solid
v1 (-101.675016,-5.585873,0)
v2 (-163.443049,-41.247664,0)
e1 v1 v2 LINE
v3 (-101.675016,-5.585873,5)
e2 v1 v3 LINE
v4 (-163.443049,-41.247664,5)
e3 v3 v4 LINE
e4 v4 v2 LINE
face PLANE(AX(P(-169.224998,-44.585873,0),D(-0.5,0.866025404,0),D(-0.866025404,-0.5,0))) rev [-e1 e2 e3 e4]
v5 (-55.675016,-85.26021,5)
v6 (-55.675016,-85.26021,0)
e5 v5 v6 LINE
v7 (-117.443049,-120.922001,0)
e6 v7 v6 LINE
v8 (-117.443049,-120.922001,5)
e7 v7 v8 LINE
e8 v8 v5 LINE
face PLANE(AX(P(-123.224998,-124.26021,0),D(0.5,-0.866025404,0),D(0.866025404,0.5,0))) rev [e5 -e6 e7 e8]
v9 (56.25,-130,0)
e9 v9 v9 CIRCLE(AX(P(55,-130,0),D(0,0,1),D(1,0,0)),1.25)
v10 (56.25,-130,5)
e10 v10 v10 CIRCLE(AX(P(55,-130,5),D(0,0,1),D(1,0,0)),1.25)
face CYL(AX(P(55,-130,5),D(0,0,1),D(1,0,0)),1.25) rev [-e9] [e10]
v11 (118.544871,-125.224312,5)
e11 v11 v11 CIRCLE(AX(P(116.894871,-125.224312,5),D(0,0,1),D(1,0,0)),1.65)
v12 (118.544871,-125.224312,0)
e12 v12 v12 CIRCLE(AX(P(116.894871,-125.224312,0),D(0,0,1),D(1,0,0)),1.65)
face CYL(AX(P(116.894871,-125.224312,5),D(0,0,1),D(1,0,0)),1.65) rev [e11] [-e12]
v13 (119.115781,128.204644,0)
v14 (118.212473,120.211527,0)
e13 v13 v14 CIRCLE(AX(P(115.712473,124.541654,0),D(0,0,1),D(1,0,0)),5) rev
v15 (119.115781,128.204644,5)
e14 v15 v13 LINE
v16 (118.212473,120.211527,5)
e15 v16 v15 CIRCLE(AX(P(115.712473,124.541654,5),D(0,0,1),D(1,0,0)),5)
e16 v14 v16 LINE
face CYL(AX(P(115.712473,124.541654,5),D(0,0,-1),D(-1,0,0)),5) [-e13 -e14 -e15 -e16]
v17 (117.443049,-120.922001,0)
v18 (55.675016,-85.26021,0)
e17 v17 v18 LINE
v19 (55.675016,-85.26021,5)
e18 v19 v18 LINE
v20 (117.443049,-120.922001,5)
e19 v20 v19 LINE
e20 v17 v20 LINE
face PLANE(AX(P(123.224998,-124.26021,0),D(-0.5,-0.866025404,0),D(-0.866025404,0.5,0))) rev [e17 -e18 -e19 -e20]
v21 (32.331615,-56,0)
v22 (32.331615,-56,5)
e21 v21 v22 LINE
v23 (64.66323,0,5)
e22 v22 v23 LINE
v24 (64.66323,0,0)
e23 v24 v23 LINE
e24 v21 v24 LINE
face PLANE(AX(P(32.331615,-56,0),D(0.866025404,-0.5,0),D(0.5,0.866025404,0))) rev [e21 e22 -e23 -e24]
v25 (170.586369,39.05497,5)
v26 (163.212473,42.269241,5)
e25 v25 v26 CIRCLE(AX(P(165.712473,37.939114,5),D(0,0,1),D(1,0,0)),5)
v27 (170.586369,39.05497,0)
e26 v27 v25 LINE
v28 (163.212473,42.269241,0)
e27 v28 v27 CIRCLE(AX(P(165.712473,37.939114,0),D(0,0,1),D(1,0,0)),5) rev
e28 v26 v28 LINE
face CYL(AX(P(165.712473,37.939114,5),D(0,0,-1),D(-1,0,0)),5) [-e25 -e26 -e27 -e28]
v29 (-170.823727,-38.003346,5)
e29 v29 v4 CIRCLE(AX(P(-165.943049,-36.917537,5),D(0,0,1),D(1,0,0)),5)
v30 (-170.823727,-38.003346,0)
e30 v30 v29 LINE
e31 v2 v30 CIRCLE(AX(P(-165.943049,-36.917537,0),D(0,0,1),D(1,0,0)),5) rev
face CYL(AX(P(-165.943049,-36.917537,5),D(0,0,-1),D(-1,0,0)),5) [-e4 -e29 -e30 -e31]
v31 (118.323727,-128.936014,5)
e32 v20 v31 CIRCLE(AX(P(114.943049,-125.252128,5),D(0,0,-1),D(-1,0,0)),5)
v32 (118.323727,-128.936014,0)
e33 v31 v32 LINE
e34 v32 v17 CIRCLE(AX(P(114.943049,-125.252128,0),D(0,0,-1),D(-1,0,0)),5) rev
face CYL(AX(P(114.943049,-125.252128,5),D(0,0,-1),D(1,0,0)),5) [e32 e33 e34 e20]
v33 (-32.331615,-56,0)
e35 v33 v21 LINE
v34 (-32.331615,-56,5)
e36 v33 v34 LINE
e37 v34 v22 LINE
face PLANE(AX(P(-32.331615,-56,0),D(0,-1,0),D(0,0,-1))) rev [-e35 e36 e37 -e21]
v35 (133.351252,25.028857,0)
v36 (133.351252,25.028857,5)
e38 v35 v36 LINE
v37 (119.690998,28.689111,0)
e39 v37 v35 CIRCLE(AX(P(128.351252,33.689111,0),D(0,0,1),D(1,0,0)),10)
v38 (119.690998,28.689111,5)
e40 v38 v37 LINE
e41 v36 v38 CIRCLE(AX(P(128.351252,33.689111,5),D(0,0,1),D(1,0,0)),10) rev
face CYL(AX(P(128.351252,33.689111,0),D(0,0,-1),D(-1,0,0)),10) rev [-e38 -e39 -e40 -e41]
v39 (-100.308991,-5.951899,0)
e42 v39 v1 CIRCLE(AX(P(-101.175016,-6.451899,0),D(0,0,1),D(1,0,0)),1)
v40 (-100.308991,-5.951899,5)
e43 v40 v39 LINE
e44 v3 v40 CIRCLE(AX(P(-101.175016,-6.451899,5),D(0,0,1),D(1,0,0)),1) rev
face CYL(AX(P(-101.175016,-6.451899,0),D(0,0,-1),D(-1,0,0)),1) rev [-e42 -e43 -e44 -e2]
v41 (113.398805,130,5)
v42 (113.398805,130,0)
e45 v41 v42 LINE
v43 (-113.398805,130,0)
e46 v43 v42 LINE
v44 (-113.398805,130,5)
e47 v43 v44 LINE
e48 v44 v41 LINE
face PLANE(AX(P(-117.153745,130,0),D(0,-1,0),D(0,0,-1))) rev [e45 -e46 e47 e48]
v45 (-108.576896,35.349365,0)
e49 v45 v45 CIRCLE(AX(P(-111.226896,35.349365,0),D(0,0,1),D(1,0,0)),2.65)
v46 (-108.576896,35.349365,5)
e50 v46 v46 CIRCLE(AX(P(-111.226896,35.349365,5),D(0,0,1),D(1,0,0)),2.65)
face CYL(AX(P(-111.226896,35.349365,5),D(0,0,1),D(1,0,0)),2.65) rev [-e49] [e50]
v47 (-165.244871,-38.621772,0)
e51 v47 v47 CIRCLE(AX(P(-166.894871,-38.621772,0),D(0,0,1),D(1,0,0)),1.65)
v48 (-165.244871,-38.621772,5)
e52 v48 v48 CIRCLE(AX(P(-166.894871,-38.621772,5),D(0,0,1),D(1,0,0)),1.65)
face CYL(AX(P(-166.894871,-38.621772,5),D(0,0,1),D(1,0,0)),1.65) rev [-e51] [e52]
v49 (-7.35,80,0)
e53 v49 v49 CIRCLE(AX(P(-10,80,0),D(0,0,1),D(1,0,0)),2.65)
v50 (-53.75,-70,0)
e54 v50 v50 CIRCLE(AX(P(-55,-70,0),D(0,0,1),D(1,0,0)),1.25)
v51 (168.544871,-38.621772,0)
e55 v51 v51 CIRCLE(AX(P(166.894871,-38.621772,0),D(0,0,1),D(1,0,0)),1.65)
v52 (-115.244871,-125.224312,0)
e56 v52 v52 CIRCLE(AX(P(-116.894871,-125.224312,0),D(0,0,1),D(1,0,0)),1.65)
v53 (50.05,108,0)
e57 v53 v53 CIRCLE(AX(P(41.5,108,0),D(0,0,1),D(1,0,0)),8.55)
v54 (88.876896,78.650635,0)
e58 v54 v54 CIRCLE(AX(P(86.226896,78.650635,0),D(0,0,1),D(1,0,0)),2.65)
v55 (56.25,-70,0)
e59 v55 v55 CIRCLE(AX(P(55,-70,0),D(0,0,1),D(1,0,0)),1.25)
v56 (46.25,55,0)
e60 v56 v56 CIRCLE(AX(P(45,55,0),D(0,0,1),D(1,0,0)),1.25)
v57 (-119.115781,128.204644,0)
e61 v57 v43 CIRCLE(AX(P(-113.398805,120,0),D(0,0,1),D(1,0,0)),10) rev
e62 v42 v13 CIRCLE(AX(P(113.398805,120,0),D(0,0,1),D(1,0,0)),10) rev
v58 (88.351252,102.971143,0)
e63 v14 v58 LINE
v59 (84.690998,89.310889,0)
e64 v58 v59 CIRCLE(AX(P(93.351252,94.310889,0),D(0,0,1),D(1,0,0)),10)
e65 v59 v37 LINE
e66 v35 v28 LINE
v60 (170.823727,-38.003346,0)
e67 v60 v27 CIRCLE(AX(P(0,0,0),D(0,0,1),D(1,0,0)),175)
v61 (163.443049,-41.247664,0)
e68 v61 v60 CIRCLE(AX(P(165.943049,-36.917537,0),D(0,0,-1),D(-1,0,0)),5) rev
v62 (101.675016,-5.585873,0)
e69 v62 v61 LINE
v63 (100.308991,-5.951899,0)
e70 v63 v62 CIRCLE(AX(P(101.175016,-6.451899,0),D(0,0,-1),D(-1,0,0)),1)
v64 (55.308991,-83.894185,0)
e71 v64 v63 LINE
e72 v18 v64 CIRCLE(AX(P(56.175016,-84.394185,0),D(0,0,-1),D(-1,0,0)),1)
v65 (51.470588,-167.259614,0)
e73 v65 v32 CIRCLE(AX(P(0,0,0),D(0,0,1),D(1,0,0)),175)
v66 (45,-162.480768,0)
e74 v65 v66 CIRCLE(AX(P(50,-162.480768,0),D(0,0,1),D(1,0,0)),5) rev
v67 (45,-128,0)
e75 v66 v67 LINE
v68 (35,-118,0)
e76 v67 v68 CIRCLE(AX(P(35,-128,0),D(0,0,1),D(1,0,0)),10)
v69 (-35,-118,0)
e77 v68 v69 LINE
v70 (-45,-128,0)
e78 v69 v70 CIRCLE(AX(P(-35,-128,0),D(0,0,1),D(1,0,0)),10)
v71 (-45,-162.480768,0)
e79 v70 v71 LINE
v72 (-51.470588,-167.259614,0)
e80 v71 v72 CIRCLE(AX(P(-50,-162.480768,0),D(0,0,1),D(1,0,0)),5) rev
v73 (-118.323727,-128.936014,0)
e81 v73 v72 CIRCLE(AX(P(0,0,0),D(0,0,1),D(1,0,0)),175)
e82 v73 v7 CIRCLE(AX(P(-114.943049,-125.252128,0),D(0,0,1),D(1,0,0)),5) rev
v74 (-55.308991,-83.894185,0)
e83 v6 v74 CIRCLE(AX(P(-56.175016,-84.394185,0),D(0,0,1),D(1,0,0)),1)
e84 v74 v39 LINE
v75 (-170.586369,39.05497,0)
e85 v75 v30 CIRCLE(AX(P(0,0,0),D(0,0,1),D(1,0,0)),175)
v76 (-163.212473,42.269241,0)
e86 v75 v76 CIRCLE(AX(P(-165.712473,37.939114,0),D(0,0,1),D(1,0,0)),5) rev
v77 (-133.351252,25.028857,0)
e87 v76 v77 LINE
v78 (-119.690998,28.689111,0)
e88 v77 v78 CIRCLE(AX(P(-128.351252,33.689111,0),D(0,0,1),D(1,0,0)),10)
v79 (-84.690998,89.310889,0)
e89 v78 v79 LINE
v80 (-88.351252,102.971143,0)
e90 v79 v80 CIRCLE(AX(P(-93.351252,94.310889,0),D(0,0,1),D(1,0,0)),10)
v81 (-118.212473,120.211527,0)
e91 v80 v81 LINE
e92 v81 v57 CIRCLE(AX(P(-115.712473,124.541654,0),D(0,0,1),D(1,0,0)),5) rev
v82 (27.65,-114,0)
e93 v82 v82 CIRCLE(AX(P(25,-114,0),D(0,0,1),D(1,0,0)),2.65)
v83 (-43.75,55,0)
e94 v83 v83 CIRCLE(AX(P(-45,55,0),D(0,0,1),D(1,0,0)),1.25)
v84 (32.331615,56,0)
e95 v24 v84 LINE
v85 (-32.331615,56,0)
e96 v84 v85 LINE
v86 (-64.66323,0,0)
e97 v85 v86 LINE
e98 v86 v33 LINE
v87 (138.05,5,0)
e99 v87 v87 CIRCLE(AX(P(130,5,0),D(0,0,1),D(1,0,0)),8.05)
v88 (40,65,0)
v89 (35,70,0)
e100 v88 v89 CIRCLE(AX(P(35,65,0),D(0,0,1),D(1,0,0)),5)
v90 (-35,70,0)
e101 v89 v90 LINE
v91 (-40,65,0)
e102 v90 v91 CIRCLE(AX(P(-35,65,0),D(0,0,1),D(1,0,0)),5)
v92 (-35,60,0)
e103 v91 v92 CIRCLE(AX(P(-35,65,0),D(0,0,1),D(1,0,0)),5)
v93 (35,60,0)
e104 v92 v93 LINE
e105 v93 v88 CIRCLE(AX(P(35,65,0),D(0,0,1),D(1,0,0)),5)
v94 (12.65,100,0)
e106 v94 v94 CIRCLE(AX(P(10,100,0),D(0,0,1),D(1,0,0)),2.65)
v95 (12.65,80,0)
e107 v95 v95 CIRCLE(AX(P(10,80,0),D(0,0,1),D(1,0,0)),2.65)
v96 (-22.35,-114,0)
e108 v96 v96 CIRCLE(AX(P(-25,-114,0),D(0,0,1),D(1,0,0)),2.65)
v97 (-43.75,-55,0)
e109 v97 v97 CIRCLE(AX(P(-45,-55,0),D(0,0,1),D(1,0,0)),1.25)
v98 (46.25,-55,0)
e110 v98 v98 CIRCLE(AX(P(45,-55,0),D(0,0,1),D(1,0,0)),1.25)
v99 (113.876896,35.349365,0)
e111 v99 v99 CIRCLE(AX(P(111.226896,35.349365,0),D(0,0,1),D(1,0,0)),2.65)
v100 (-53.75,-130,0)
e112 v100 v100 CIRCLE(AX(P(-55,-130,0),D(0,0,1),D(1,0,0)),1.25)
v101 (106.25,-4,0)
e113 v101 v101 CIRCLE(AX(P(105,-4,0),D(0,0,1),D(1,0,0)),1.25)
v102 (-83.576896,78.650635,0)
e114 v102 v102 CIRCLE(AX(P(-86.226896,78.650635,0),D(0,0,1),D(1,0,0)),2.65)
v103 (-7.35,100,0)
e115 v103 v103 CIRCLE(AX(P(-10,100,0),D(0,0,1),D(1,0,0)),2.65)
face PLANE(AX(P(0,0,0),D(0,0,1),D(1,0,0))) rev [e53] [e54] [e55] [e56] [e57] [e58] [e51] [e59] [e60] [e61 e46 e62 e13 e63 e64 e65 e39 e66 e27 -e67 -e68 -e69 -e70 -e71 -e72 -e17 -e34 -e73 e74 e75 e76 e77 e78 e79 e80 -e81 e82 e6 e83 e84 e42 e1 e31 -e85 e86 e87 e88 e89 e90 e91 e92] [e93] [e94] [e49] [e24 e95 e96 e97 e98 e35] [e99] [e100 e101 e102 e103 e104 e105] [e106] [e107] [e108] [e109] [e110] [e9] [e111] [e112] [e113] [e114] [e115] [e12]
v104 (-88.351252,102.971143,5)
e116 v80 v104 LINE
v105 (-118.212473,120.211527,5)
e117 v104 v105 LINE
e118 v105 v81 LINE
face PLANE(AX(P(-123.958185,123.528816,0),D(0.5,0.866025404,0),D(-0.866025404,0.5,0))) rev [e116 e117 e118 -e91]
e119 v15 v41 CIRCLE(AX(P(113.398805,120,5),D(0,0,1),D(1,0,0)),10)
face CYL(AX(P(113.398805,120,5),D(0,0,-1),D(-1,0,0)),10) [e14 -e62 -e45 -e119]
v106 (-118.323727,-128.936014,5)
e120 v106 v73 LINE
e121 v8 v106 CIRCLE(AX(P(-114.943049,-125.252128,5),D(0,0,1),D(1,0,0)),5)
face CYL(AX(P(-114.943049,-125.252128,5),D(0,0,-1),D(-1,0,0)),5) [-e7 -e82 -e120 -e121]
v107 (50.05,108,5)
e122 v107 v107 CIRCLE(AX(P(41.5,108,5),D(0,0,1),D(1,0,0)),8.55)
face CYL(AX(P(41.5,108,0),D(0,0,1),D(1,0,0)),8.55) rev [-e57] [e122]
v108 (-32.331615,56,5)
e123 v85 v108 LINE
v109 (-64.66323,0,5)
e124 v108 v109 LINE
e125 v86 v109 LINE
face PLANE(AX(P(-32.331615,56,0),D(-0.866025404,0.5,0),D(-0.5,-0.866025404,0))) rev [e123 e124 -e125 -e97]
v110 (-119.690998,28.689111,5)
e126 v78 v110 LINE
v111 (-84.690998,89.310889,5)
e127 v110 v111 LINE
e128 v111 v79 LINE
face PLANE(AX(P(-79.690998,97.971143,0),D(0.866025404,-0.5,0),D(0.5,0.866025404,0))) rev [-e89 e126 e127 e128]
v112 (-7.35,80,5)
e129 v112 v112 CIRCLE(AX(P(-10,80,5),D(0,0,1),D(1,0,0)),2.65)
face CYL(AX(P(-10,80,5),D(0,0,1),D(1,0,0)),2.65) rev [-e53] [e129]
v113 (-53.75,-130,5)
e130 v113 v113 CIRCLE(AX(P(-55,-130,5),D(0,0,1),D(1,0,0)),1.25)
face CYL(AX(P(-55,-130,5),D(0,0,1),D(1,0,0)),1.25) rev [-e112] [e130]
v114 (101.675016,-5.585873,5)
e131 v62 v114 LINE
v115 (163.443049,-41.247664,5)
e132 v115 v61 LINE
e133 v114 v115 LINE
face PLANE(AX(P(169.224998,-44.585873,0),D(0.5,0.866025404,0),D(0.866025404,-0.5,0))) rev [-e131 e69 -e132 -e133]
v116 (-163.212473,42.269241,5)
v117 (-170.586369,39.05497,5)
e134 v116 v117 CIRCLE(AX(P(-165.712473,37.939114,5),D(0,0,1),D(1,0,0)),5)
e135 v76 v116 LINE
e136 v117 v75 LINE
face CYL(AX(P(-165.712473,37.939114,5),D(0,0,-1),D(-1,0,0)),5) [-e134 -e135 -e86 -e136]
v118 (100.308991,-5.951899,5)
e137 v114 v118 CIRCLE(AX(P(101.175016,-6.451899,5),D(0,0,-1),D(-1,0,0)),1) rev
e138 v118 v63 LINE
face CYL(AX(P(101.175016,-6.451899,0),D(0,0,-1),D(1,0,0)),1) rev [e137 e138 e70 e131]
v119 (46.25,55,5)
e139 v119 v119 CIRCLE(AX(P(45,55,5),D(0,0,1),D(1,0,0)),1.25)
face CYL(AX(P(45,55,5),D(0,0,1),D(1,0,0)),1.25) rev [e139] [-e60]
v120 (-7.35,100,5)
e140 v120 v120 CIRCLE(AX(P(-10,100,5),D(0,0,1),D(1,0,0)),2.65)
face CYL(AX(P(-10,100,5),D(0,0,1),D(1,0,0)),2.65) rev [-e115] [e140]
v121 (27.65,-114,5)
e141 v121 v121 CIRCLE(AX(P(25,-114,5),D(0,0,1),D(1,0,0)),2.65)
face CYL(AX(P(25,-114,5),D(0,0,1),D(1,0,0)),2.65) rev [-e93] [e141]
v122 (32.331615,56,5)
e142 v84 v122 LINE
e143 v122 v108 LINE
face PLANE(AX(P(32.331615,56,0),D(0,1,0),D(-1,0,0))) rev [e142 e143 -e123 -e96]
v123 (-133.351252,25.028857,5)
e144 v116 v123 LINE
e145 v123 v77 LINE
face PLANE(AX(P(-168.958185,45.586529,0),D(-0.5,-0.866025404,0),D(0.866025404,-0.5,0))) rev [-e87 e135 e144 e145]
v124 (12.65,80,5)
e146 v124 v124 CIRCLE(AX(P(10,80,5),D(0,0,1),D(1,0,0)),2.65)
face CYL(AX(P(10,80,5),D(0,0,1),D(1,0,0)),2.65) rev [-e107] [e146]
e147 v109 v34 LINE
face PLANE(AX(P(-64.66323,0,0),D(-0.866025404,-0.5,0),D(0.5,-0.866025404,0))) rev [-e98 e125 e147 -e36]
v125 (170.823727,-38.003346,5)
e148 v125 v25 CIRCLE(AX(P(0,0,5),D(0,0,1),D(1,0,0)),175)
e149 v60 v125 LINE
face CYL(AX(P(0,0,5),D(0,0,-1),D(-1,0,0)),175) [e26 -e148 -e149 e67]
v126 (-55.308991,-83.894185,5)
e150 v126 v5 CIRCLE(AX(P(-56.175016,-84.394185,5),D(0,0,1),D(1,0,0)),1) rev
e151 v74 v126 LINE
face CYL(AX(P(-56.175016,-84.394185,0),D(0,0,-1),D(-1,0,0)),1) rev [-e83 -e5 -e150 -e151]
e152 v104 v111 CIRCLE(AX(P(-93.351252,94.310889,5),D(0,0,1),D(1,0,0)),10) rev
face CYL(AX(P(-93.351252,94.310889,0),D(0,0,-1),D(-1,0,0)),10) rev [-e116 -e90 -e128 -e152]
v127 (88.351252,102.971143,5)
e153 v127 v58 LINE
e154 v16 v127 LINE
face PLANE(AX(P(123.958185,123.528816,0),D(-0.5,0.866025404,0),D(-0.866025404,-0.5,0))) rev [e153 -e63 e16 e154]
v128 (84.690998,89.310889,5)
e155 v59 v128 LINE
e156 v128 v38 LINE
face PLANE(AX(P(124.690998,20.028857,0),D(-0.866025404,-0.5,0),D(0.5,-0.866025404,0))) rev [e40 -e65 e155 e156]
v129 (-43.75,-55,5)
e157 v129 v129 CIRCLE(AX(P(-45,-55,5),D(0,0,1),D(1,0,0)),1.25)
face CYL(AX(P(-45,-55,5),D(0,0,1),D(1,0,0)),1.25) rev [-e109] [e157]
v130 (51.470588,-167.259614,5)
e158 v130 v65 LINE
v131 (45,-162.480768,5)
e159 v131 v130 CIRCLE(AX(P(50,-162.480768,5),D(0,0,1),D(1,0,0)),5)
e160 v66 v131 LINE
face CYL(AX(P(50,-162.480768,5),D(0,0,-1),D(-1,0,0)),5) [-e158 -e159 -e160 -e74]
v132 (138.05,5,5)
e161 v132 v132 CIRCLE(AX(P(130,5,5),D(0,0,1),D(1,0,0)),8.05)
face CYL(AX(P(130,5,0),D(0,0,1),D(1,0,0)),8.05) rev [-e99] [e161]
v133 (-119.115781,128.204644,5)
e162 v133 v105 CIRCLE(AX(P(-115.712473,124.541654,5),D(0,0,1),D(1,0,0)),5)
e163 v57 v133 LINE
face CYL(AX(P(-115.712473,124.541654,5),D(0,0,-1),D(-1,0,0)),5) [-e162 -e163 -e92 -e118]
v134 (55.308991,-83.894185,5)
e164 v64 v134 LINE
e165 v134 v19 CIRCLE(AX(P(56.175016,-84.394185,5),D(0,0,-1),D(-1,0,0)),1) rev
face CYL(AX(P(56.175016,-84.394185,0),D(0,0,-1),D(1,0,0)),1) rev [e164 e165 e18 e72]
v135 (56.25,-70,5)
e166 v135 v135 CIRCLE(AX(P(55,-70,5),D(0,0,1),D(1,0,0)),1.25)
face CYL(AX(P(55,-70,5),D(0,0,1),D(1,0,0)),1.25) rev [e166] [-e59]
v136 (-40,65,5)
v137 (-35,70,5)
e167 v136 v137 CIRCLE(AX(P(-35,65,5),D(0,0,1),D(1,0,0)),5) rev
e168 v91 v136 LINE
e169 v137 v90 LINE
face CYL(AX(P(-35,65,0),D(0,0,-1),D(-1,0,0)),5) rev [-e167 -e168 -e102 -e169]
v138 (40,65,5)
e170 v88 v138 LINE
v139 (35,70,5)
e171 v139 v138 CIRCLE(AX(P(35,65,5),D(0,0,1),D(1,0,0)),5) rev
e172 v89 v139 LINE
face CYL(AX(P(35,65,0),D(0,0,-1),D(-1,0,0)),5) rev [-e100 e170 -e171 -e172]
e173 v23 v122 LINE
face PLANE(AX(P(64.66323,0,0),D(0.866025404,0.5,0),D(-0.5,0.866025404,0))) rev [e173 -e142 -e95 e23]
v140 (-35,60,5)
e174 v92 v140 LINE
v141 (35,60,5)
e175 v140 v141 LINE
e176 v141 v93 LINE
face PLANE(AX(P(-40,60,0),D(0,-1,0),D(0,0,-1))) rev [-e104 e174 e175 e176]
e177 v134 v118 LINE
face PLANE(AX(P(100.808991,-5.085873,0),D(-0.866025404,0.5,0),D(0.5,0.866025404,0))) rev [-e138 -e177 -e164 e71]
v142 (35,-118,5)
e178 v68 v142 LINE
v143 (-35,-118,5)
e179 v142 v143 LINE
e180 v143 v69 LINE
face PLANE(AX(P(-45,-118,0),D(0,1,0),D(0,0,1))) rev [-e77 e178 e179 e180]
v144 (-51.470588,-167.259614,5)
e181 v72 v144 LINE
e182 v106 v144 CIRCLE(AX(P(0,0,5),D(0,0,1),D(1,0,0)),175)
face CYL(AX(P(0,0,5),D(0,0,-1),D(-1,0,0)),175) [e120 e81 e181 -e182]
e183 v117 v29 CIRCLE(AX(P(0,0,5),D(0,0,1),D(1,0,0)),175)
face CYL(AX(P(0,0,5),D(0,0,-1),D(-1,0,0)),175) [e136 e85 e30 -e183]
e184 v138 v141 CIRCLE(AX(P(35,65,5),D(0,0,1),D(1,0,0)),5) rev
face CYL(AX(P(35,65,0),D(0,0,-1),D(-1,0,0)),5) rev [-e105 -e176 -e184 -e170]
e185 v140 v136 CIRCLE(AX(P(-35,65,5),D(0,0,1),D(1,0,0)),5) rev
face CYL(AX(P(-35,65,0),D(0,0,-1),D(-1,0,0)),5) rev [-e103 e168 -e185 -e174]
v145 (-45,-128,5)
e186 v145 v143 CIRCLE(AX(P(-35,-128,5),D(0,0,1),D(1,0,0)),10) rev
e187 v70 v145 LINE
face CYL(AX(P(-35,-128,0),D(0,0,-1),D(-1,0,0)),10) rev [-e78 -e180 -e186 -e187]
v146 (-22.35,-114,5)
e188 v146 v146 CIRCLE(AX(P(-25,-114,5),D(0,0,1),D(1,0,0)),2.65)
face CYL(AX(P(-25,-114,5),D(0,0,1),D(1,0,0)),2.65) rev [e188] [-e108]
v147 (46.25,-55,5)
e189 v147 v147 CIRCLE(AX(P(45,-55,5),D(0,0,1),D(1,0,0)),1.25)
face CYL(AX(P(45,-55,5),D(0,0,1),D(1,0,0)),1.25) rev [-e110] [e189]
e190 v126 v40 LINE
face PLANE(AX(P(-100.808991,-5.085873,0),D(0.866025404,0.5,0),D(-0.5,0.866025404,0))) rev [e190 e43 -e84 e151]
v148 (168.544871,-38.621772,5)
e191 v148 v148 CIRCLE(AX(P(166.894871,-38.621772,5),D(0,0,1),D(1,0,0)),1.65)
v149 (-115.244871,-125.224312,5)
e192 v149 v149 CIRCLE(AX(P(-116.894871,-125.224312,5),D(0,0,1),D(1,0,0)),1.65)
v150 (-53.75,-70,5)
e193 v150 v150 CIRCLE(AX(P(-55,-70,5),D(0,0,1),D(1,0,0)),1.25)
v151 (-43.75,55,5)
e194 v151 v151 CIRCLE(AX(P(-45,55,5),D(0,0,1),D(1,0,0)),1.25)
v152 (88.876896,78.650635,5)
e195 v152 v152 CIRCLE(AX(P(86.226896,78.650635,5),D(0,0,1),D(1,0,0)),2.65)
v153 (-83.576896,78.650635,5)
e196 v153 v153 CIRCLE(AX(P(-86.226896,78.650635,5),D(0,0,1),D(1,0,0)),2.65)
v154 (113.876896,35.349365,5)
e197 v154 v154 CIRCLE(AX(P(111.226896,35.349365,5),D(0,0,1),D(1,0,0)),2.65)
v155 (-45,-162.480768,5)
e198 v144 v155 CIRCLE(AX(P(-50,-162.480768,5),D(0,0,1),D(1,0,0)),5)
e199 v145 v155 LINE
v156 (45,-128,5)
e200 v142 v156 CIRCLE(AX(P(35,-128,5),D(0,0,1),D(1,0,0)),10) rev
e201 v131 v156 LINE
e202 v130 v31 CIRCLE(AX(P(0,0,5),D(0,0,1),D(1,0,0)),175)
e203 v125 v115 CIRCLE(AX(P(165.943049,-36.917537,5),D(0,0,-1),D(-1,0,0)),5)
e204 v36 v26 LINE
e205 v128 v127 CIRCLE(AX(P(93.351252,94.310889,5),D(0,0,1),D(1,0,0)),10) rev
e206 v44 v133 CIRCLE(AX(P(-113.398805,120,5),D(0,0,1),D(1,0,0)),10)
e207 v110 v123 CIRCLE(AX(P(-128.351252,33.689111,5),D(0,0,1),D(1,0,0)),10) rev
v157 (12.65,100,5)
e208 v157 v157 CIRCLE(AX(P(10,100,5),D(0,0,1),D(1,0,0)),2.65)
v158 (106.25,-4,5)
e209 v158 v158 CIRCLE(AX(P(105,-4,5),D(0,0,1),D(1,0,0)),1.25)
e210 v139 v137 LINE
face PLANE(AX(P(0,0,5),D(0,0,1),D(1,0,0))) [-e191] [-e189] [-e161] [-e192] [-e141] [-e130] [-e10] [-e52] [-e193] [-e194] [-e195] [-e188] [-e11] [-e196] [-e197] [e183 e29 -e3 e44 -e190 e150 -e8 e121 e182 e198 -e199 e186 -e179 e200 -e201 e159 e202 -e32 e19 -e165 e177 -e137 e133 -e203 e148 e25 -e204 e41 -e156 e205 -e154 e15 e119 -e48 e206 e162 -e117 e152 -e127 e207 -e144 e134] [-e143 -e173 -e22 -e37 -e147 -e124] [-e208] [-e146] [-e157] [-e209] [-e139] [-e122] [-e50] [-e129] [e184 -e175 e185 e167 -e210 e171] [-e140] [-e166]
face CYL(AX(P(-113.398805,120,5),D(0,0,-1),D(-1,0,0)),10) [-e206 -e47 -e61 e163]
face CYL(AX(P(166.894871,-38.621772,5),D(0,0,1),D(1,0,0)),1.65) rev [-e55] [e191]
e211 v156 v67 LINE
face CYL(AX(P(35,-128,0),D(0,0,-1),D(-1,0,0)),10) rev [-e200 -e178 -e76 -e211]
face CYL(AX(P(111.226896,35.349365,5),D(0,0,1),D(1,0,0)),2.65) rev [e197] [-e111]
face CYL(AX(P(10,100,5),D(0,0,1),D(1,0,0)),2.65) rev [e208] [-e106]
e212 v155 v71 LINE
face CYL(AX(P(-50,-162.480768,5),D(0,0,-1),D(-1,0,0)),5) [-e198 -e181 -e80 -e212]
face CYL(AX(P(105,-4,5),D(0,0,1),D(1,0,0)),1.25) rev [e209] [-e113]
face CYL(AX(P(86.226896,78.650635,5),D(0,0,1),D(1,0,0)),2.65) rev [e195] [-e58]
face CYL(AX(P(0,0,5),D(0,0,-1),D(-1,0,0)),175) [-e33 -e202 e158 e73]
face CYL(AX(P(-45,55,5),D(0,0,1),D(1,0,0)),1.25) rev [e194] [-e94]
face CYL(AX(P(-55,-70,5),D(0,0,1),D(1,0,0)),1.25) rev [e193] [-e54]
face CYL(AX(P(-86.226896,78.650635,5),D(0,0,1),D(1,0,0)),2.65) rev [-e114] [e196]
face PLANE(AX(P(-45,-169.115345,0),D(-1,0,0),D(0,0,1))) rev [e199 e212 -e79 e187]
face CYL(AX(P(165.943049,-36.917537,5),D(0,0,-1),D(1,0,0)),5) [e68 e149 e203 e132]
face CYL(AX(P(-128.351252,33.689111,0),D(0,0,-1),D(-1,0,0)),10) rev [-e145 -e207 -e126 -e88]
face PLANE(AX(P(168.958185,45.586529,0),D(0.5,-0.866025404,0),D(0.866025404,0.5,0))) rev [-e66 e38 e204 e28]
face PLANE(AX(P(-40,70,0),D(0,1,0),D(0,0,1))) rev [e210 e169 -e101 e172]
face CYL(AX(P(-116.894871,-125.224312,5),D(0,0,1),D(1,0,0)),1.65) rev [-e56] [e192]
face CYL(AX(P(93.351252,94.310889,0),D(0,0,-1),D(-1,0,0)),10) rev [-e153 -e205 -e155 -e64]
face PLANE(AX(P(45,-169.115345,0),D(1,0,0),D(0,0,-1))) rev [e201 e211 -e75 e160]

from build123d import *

# Parameters (mm, degrees)
SKETCH_1_R                   = 175
EXTRUDE_1_DEPTH              = 5
CUT_EXTRUDE_1_DEPTH          = 248.53787589
CUT_EXTRUDE_2_DEPTH          = 248.53787589
CUT_EXTRUDE_5_DEPTH          = 248.53787589
CUT_EXTRUDE_4_DEPTH          = 248.53787589
HOLE_WIZARD_M5_1_D           = 5.3
FILLET_1_R                   = 1
FILLET_2_R                   = 10
FILLET_3_R                   = 5
PATTERN_CIRCULAR_1_OUTLINE_R = 2.65
PATTERN_CIRCULAR_1_DEPTH     = 5
HOLE_WIZARD_M5_2_D           = 5.3
SKETCH_15_R                  = 8.55
CUT_EXTRUDE_3_DEPTH          = 243.280431899
MIRROR_1_DEPTH               = 5
SKETCH_18_W                  = 80
SKETCH_18_H                  = 10
CUT_EXTRUDE_6_DEPTH          = 243.280431899
FILLET_4_R                   = 5
M4X0_7_3_D                   = 3.3
SKETCH_33_R                  = 8.05
CUT_EXTRUDE_7_DEPTH          = 243.280431899
M3X0_5_2_D                   = 2.5
M3X0_5_3_D                   = 2.5
FILLET_5_R                   = 10


with BuildPart() as part:
    # 草圖1 → 填料-伸長1 (new body)
    with BuildSketch(Plane.XY):
        Circle(SKETCH_1_R)
    extrude(amount=EXTRUDE_1_DEPTH)

    # 草圖6 → 除料-伸長1 (cut, through all)
    with BuildSketch(Plane.XY.offset(5)):
        with BuildLine():
            Line((-45, -169.115345253), (-45, -118))
            Line((-45, -118), (45, -118))
            Line((45, -118), (45, -169.115345253))
            ThreePointArc((45, -169.115345253), (0, -175), (-45, -169.115345253))
        make_face()
    extrude(amount=-CUT_EXTRUDE_1_DEPTH, mode=Mode.SUBTRACT)

    # 草圖11 → 除料-伸長2 (cut, through all)
    with BuildSketch(Plane.XY.offset(5)):
        Polygon((64.663230149, 0), (32.331615075, 56), (-32.331615075, 56), (-64.663230149, 0), (-32.331615075, -56), (32.331615075, -56), align=None)
    extrude(amount=-CUT_EXTRUDE_2_DEPTH, mode=Mode.SUBTRACT)

    # 草圖17 → 除料-伸長5 (cut, through all)
    with BuildSketch(Plane.XY.offset(5)):
        with BuildLine():
            Line((-169.224997863, -44.585873304), (-100.808990964, -5.085873304))
            Line((-100.808990964, -5.085873304), (-54.808990964, -84.760210452))
            Line((-54.808990964, -84.760210452), (-123.224997863, -124.260210452))
            ThreePointArc((-123.224997863, -124.260210452), (-151.554445662, -87.5), (-169.224997863, -44.585873304))
        make_face()
    extrude(amount=-CUT_EXTRUDE_5_DEPTH, mode=Mode.SUBTRACT)

    # 草圖16 → 除料-伸長4 (cut, through all)
    with BuildSketch(Plane.XY.offset(5)):
        with BuildLine():
            Line((-117.153745139, 130), (117.153745139, 130))
            ThreePointArc((117.153745139, 130), (0, 175), (-117.153745139, 130))
        make_face()
    extrude(amount=-CUT_EXTRUDE_4_DEPTH, mode=Mode.SUBTRACT)

    # M5 餘隙孔1 (through all)
    with Locations(Plane.XY.offset(5)):
        with Locations((25, -114), (-25, -114)):
            Hole(HOLE_WIZARD_M5_1_D / 2)

    # 圓角1
    fillet_1_edges = [part.edges().sort_by_distance(p)[0] for p in [
        (-100.808990964, -5.085873304, 2.5),
        (-54.808990964, -84.760210452, 2.5),
    ]]
    fillet(fillet_1_edges, radius=FILLET_1_R)

    # 圓角2
    fillet_2_edges = [part.edges().sort_by_distance(p)[0] for p in [
        (45, -118, 2.5),
        (-45, -118, 2.5),
    ]]
    fillet(fillet_2_edges, radius=FILLET_2_R)

    # 圓角3
    fillet_3_edges = [part.edges().sort_by_distance(p)[0] for p in [
        (45, -169.115345253, 2.5),
        (-45, -169.115345253, 2.5),
        (-123.224997863, -124.260210452, 2.5),
        (-169.224997863, -44.585873304, 2.5),
    ]]
    fillet(fillet_3_edges, radius=FILLET_3_R)

    # 環狀複製排列1: read off the stored shape, not the designer's step
    # 環狀複製排列1 outline → 環狀複製排列1 (cut)
    with BuildSketch(Plane.XY):
        with BuildLine():
            ThreePointArc((-170.586369053, 39.054970147), (-167.71040421, 42.522591801), (-163.212472795, 42.269240876))
            Line((-163.212472795, 42.269240876), (-133.351251684, 25.02885683))
            ThreePointArc((-133.351251684, 25.02885683), (-125.763061233, 24.029852605), (-119.690997647, 28.689110868))
            Line((-119.690997647, 28.689110868), (-84.690997647, 89.310889132))
            ThreePointArc((-84.690997647, 89.310889132), (-83.691993422, 96.899079583), (-88.351251684, 102.97114317))
            Line((-88.351251684, 102.97114317), (-118.212472795, 120.211527217))
            ThreePointArc((-118.212472795, 120.211527217), (-120.680846839, 123.980174625), (-119.115780818, 128.204644066))
            ThreePointArc((-119.115780818, 128.204644066), (-151.554445662, 87.5), (-170.586369053, 39.054970147))
        make_face()
        with BuildLine():
            ThreePointArc((119.115780818, 128.204644066), (120.680846839, 123.980174625), (118.212472795, 120.211527217))
            Line((118.212472795, 120.211527217), (88.351251684, 102.97114317))
            ThreePointArc((88.351251684, 102.97114317), (83.691993422, 96.899079583), (84.690997647, 89.310889132))
            Line((84.690997647, 89.310889132), (119.690997647, 28.689110868))
            ThreePointArc((119.690997647, 28.689110868), (125.763061233, 24.029852605), (133.351251684, 25.02885683))
            Line((133.351251684, 25.02885683), (163.212472795, 42.269240876))
            ThreePointArc((163.212472795, 42.269240876), (167.71040421, 42.522591801), (170.586369053, 39.054970147))
            ThreePointArc((170.586369053, 39.054970147), (151.554445663, 87.5), (119.115780818, 128.204644066))
        make_face()
        with Locations((86.226896031, 78.650635095)):
            Circle(PATTERN_CIRCULAR_1_OUTLINE_R)
        with Locations((111.226896031, 35.349364905)):
            Circle(PATTERN_CIRCULAR_1_OUTLINE_R)
        with Locations((-111.226896031, 35.349364905)):
            Circle(PATTERN_CIRCULAR_1_OUTLINE_R)
        with Locations((-86.226896031, 78.650635095)):
            Circle(PATTERN_CIRCULAR_1_OUTLINE_R)
    extrude(amount=PATTERN_CIRCULAR_1_DEPTH, mode=Mode.SUBTRACT)

    # M5 餘隙孔2 (through all)
    with Locations(Plane.XY.offset(5)):
        with Locations((10, 100), (-10, 80), (-10, 100), (10, 80)):
            Hole(HOLE_WIZARD_M5_2_D / 2)

    # 草圖15 → 除料-伸長3 (cut, through all)
    with BuildSketch(Plane.XY.offset(5)):
        with Locations((41.5, 108)):
            Circle(SKETCH_15_R)
    extrude(amount=-CUT_EXTRUDE_3_DEPTH, mode=Mode.SUBTRACT)

    # 鏡射1: read off the stored shape, not the designer's step
    # 鏡射1 outline → 鏡射1 (cut)
    with BuildSketch(Plane.XY):
        with BuildLine():
            ThreePointArc((118.323726866, -128.936013823), (151.554445662, -87.5), (170.823726866, -38.003346425))
            ThreePointArc((170.823726866, -38.003346425), (167.955089021, -41.494838656), (163.443048956, -41.247663546))
            Line((163.443048956, -41.247663546), (101.675016368, -5.585873304))
            ThreePointArc((101.675016368, -5.585873304), (100.916197323, -5.485972882), (100.308990964, -5.951898708))
            Line((100.308990964, -5.951898708), (55.308990964, -83.894185049))
            ThreePointArc((55.308990964, -83.894185049), (55.209090541, -84.653004094), (55.675016368, -85.260210452))
            Line((55.675016368, -85.260210452), (117.443048956, -120.922000695))
            ThreePointArc((117.443048956, -120.922000695), (119.913128913, -124.705954459), (118.323726866, -128.936013823))
        make_face()
    extrude(amount=MIRROR_1_DEPTH, mode=Mode.SUBTRACT)

    # 草圖18 → 除料-伸長6 (cut, through all)
    with BuildSketch(Plane.XY.offset(5)):
        with Locations((0, 65)):
            Rectangle(SKETCH_18_W, SKETCH_18_H)
    extrude(amount=-CUT_EXTRUDE_6_DEPTH, mode=Mode.SUBTRACT)

    # 圓角4
    fillet_4_edges = [part.edges().sort_by_distance(p)[0] for p in [
        (40, 70, 2.5),
        (40, 60, 2.5),
        (-40, 60, 2.5),
        (-40, 70, 2.5),
    ]]
    fillet(fillet_4_edges, radius=FILLET_4_R - 0.0001)  # a hair under: the kernel refuses the full size

    # M4x0.7 螺紋孔3 (through all)
    with Locations(Plane.XY.offset(5)):
        with Locations((-116.894870844, -125.224312068), (-166.894870844, -38.621771689)):
            m4x0_7_3 = Hole(M4X0_7_3_D / 2)

    # 鏡射2: M4x0.7 螺紋孔3 across plane
    add(m4x0_7_3.mirror(Plane(origin=(0, 0, 0), x_dir=(0, 0, 1), z_dir=(1, 0, 0))), mode=Mode.SUBTRACT)

    # 草圖33 → 除料-伸長7 (cut, through all)
    with BuildSketch(Plane.XY.offset(5)):
        with Locations((130, 5)):
            Circle(SKETCH_33_R)
    extrude(amount=-CUT_EXTRUDE_7_DEPTH, mode=Mode.SUBTRACT)

    # M3x0.5 螺紋孔2 (through all)
    with Locations(Plane.XY.offset(5)):
        with Locations((55, -130), (55, -70), (-55, -130), (-55, -70)):
            Hole(M3X0_5_2_D / 2)

    # M3x0.5 螺紋孔3 (through all)
    with Locations(Plane.XY.offset(5)):
        with Locations((45, 55), (-45, -55), (-45, 55), (45, -55), (105, -4)):
            Hole(M3X0_5_3_D / 2)

    # 圓角5
    # the kernel refuses this fillet: 10 mm, written as the material it takes off along each edge
    with BuildSketch(Plane(origin=(117.153745139, 130, 14.387351056), x_dir=(-1, 0, 0), z_dir=(0, 0, -1))) as fillet_5_piece_1:
        with BuildLine():
            CenterArc((3.754940423, -10), FILLET_5_R, 90, 34.868690312)
            ThreePointArc((-1.962035679, -1.795355934), (-0.984428411, -0.89395076), (0, 0))
            Line((0, 0), (3.754940423, 0))
        make_face()
    extrude(amount=23.774702113, mode=Mode.SUBTRACT)
    with BuildSketch(Plane(origin=(-117.153745139, 130, 14.387351056), x_dir=(-0.7377488527785091, -0.6750752774498513, 0), z_dir=(0, 0, -1))) as fillet_5_piece_2:
        with BuildLine():
            CenterArc((3.980549786, -9.912355975), FILLET_5_R, 97.591305891, 34.868690312)
            Line((-2.770202989, -2.534867448), (0, 0))
            ThreePointArc((0, 0), (1.329744988, 0.005052135), (2.659489977, 0))
        make_face()
    extrude(amount=23.774702113, mode=Mode.SUBTRACT)


solid = part.part
